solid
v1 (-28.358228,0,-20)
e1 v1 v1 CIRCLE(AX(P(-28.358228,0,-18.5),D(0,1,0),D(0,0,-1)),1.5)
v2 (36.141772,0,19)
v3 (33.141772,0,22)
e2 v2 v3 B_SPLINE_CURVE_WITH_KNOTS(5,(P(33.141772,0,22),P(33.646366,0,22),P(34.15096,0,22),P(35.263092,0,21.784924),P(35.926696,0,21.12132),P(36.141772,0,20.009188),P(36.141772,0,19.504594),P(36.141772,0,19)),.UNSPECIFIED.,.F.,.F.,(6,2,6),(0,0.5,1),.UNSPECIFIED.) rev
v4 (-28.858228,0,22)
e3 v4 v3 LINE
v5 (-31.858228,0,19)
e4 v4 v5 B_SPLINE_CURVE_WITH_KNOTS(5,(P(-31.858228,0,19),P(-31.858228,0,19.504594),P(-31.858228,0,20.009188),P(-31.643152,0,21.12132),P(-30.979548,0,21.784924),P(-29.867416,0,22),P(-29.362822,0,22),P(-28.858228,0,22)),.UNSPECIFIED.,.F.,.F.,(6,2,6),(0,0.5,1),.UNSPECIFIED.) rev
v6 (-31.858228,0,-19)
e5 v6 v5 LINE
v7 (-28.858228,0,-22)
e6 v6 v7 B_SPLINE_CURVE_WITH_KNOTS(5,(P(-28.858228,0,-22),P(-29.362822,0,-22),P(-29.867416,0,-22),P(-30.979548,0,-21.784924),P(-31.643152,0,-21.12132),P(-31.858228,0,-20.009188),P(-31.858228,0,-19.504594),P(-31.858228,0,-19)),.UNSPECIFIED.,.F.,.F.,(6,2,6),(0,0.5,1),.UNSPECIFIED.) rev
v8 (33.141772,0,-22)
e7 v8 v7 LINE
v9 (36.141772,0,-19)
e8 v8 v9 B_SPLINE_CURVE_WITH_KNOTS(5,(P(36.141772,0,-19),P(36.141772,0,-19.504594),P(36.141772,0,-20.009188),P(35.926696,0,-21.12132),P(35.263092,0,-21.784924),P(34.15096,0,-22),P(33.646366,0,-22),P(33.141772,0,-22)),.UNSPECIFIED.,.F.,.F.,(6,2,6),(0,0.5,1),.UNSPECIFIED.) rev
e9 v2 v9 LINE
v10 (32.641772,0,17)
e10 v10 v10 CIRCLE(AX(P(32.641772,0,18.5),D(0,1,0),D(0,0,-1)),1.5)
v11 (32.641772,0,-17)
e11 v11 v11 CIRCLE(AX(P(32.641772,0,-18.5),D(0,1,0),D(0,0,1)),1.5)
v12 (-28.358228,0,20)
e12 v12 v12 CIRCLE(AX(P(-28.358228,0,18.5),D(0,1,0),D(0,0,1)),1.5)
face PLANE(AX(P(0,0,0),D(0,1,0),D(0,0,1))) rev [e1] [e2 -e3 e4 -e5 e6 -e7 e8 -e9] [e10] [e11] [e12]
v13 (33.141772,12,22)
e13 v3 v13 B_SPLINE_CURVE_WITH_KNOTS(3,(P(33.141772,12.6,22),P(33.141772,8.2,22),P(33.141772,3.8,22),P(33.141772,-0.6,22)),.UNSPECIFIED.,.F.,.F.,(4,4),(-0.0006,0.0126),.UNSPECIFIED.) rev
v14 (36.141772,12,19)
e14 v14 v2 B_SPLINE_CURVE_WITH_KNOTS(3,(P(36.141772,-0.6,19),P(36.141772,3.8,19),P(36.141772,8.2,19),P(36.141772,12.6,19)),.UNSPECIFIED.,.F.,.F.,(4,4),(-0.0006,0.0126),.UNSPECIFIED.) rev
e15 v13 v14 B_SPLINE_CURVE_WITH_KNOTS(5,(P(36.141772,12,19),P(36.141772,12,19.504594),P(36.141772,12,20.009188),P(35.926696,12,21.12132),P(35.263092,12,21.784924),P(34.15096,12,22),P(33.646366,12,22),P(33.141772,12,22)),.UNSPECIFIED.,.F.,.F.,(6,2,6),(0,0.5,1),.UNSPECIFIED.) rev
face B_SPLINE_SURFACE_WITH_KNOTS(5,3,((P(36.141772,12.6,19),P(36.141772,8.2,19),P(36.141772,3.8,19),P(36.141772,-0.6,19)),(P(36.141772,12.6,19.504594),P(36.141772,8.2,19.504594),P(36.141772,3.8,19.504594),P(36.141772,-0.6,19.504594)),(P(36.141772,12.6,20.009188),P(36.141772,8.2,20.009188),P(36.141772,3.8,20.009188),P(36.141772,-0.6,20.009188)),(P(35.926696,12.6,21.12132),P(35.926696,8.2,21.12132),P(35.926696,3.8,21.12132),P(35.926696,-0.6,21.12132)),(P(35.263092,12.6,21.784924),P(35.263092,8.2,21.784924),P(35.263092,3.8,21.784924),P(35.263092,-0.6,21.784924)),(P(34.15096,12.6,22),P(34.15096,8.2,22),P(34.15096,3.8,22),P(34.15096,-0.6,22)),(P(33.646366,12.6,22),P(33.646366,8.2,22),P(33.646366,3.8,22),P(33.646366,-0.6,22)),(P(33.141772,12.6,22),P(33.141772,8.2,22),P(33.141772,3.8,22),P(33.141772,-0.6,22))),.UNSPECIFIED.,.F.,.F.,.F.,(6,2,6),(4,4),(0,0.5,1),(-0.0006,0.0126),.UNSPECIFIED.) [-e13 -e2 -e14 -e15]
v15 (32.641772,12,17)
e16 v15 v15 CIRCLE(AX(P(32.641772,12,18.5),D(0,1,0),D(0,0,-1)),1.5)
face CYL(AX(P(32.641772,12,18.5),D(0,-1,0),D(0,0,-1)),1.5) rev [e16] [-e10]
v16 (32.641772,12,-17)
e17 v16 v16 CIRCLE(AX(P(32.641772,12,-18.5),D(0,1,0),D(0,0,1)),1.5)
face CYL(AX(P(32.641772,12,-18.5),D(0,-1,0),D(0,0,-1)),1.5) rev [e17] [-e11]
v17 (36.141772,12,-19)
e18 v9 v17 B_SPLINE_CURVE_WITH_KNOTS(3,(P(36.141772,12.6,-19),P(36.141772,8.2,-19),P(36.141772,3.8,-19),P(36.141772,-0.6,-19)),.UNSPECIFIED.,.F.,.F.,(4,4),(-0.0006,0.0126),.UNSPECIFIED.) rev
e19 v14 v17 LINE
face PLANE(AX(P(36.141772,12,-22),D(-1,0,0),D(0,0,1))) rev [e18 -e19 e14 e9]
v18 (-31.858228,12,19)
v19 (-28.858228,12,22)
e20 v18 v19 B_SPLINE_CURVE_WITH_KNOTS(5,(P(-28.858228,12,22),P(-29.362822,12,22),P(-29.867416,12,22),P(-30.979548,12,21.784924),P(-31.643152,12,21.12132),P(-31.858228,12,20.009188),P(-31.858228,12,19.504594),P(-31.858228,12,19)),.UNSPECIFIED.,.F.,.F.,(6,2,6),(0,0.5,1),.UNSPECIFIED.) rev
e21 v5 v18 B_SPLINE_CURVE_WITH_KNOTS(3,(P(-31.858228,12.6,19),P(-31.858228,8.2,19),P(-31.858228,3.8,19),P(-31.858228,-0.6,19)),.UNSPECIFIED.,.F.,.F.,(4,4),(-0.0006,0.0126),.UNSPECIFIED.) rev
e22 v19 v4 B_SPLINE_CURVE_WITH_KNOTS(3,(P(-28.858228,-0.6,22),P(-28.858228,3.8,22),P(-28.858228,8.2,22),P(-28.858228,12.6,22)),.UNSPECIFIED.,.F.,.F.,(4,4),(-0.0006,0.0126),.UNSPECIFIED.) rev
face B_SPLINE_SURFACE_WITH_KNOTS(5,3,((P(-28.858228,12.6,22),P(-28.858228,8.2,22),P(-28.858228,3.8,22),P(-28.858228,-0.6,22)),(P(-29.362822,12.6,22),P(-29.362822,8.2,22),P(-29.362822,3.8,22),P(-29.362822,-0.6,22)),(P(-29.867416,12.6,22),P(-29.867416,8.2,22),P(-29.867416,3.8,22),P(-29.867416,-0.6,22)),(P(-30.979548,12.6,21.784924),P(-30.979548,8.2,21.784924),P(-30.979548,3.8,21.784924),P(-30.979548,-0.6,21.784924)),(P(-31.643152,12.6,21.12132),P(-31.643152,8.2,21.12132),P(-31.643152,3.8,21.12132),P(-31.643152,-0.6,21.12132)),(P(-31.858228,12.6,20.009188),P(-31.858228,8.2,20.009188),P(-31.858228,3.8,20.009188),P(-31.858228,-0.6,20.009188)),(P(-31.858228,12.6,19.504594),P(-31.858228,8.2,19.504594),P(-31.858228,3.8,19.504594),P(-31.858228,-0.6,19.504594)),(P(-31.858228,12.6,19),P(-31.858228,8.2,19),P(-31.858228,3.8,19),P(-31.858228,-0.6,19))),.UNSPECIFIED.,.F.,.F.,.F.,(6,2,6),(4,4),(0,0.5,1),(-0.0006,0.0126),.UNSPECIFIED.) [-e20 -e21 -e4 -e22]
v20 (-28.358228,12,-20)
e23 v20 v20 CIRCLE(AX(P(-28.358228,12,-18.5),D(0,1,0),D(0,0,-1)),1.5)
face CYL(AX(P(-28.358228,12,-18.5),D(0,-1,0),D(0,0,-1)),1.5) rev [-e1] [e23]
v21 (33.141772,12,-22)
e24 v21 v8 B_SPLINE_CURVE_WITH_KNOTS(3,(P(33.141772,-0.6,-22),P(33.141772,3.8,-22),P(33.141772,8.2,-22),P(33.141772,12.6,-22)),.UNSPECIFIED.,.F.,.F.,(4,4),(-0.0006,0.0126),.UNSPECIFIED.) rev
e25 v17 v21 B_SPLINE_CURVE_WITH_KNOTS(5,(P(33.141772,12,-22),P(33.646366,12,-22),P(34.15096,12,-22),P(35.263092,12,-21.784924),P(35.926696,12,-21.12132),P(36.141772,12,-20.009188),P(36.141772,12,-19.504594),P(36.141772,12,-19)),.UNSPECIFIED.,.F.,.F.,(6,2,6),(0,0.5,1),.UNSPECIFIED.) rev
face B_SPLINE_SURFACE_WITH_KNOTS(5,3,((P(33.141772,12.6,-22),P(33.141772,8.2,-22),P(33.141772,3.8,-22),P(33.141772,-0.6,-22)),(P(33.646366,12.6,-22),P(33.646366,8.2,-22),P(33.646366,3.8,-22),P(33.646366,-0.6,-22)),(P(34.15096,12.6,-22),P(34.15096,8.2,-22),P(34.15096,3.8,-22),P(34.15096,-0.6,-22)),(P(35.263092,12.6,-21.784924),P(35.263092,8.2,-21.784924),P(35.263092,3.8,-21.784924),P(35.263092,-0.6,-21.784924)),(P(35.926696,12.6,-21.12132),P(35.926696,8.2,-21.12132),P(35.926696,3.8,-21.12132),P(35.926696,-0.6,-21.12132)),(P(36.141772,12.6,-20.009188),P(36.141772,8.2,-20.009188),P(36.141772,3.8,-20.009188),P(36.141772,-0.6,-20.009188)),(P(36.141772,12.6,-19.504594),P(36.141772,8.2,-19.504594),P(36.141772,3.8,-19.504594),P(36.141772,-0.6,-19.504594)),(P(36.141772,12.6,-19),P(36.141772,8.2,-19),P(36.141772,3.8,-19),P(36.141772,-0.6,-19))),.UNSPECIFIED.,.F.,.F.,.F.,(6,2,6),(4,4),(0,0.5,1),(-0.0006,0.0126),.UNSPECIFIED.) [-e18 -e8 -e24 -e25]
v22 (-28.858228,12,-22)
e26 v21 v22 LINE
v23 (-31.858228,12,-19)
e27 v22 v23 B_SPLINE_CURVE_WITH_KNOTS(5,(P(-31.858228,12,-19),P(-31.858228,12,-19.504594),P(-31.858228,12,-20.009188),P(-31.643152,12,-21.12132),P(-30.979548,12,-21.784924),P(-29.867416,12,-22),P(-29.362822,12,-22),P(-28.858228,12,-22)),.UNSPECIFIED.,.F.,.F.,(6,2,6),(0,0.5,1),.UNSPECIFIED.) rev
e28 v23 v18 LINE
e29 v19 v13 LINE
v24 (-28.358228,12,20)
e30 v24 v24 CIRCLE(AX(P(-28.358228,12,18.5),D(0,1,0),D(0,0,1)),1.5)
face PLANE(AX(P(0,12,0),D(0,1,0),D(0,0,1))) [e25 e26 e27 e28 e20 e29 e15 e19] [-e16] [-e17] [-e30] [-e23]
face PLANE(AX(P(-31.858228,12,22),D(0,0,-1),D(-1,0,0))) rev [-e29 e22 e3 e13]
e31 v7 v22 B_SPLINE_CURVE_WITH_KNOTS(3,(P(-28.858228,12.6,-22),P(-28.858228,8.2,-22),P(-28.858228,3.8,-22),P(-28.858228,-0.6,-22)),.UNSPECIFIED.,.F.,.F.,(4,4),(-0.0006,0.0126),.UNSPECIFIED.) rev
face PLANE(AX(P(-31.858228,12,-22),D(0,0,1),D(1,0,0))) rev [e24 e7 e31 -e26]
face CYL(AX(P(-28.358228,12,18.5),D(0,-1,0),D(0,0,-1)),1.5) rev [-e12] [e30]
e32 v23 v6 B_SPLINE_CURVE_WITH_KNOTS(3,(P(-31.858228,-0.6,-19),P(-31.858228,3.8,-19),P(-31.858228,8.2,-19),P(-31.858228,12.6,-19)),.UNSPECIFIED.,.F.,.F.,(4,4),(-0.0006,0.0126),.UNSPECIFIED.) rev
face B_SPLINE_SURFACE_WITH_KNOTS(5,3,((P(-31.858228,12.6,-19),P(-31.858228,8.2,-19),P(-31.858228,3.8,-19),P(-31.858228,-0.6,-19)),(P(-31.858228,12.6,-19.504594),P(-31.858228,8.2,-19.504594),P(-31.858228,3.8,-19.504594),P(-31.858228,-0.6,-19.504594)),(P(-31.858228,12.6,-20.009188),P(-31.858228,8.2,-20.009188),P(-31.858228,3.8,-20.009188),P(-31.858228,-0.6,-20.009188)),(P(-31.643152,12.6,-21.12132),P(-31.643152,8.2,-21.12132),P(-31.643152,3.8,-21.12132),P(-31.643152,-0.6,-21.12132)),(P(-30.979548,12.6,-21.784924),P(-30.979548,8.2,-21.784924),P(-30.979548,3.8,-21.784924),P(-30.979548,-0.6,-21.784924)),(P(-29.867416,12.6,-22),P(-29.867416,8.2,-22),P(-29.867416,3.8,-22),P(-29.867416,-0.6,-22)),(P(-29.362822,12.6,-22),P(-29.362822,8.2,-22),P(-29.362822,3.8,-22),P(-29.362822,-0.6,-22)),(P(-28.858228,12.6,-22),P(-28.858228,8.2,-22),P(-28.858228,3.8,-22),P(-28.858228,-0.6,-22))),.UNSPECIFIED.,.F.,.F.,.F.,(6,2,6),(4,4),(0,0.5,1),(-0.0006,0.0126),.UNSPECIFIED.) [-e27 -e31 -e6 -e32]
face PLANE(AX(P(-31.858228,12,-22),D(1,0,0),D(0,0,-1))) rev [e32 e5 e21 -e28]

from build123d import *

# Parameters (mm, degrees)
SKETCH_1_W      = 68
SKETCH_1_H      = 44
SKETCH_1_R      = 1.5
EXTRUDE_1_DEPTH = 12
FILLET_1_SIZE   = 3


with BuildPart() as part:
    # 草图1 → 凸台-拉伸1 (new body)
    with BuildSketch(Plane(origin=(0, 0, 0), x_dir=(1, 0, 0), z_dir=(0, 1, 0))):
        with Locations((2.141772152, 0)):
            Rectangle(SKETCH_1_W, SKETCH_1_H)
        with Locations(Location((-28.358227848, -18.5, 0), (0, 0, 270))):
            Circle(SKETCH_1_R, mode=Mode.SUBTRACT)
        with Locations(Location((32.641772152, -18.5, 0), (0, 0, 90))):
            Circle(SKETCH_1_R, mode=Mode.SUBTRACT)
        with Locations(Location((32.641772152, 18.5, 0), (0, 0, 270))):
            Circle(SKETCH_1_R, mode=Mode.SUBTRACT)
        with Locations(Location((-28.358227848, 18.5, 0), (0, 0, 90))):
            Circle(SKETCH_1_R, mode=Mode.SUBTRACT)
    extrude(amount=EXTRUDE_1_DEPTH)

    # 圆角1
    # a fillet whose section is not a circle: 3 mm, written as the material it takes off along each edge
    with BuildSketch(Plane(origin=(-31.858227848, -7.5, -22), x_dir=(1, 0, 0), z_dir=(0, 1, 0))) as fillet_1_piece_1:
        with BuildLine():
            add(Edge.make_bspline([(FILLET_1_SIZE, 0), (FILLET_1_SIZE * 0.831801948466, 0), (FILLET_1_SIZE * 0.663603896932, 0), (FILLET_1_SIZE * 0.292893218813, -FILLET_1_SIZE * 0.0716919198361), (FILLET_1_SIZE * 0.0716919198361, -FILLET_1_SIZE * 0.292893218813), (0, -FILLET_1_SIZE * 0.663603896932), (0, -FILLET_1_SIZE * 0.831801948466), (0, -FILLET_1_SIZE)], knots=[0, 0, 0, 0, 0, 0, 0.5, 0.5, 1, 1, 1, 1, 1, 1], degree=5))
            Line((0, -FILLET_1_SIZE), (0, 0))
            Line((0, 0), (FILLET_1_SIZE, 0))
        make_face()
    extrude(amount=27, mode=Mode.SUBTRACT)
    with BuildSketch(Plane(origin=(36.141772152, -7.5, -22), x_dir=(-1, 0, 0), z_dir=(0, 1, 0)), Plane(origin=(-31.858227848, -7.5, 22), x_dir=(1, 0, 0), z_dir=(0, 1, 0)), Plane(origin=(36.141772152, -7.5, 22), x_dir=(0, 0, -1), z_dir=(0, 1, 0))) as fillet_1_piece_2:
        with BuildLine():
            add(Edge.make_bspline([(FILLET_1_SIZE, 0), (FILLET_1_SIZE * 0.831801948466, 0), (FILLET_1_SIZE * 0.663603896932, 0), (FILLET_1_SIZE * 0.292893218813, FILLET_1_SIZE * 0.0716919198361), (FILLET_1_SIZE * 0.0716919198361, FILLET_1_SIZE * 0.292893218813), (0, FILLET_1_SIZE * 0.663603896932), (0, FILLET_1_SIZE * 0.831801948466), (0, FILLET_1_SIZE)], knots=[0, 0, 0, 0, 0, 0, 0.5, 0.5, 1, 1, 1, 1, 1, 1], degree=5))
            Line((0, FILLET_1_SIZE), (0, 0))
            Line((0, 0), (FILLET_1_SIZE, 0))
        make_face()
    extrude(amount=27, mode=Mode.SUBTRACT)


solid = part.part
